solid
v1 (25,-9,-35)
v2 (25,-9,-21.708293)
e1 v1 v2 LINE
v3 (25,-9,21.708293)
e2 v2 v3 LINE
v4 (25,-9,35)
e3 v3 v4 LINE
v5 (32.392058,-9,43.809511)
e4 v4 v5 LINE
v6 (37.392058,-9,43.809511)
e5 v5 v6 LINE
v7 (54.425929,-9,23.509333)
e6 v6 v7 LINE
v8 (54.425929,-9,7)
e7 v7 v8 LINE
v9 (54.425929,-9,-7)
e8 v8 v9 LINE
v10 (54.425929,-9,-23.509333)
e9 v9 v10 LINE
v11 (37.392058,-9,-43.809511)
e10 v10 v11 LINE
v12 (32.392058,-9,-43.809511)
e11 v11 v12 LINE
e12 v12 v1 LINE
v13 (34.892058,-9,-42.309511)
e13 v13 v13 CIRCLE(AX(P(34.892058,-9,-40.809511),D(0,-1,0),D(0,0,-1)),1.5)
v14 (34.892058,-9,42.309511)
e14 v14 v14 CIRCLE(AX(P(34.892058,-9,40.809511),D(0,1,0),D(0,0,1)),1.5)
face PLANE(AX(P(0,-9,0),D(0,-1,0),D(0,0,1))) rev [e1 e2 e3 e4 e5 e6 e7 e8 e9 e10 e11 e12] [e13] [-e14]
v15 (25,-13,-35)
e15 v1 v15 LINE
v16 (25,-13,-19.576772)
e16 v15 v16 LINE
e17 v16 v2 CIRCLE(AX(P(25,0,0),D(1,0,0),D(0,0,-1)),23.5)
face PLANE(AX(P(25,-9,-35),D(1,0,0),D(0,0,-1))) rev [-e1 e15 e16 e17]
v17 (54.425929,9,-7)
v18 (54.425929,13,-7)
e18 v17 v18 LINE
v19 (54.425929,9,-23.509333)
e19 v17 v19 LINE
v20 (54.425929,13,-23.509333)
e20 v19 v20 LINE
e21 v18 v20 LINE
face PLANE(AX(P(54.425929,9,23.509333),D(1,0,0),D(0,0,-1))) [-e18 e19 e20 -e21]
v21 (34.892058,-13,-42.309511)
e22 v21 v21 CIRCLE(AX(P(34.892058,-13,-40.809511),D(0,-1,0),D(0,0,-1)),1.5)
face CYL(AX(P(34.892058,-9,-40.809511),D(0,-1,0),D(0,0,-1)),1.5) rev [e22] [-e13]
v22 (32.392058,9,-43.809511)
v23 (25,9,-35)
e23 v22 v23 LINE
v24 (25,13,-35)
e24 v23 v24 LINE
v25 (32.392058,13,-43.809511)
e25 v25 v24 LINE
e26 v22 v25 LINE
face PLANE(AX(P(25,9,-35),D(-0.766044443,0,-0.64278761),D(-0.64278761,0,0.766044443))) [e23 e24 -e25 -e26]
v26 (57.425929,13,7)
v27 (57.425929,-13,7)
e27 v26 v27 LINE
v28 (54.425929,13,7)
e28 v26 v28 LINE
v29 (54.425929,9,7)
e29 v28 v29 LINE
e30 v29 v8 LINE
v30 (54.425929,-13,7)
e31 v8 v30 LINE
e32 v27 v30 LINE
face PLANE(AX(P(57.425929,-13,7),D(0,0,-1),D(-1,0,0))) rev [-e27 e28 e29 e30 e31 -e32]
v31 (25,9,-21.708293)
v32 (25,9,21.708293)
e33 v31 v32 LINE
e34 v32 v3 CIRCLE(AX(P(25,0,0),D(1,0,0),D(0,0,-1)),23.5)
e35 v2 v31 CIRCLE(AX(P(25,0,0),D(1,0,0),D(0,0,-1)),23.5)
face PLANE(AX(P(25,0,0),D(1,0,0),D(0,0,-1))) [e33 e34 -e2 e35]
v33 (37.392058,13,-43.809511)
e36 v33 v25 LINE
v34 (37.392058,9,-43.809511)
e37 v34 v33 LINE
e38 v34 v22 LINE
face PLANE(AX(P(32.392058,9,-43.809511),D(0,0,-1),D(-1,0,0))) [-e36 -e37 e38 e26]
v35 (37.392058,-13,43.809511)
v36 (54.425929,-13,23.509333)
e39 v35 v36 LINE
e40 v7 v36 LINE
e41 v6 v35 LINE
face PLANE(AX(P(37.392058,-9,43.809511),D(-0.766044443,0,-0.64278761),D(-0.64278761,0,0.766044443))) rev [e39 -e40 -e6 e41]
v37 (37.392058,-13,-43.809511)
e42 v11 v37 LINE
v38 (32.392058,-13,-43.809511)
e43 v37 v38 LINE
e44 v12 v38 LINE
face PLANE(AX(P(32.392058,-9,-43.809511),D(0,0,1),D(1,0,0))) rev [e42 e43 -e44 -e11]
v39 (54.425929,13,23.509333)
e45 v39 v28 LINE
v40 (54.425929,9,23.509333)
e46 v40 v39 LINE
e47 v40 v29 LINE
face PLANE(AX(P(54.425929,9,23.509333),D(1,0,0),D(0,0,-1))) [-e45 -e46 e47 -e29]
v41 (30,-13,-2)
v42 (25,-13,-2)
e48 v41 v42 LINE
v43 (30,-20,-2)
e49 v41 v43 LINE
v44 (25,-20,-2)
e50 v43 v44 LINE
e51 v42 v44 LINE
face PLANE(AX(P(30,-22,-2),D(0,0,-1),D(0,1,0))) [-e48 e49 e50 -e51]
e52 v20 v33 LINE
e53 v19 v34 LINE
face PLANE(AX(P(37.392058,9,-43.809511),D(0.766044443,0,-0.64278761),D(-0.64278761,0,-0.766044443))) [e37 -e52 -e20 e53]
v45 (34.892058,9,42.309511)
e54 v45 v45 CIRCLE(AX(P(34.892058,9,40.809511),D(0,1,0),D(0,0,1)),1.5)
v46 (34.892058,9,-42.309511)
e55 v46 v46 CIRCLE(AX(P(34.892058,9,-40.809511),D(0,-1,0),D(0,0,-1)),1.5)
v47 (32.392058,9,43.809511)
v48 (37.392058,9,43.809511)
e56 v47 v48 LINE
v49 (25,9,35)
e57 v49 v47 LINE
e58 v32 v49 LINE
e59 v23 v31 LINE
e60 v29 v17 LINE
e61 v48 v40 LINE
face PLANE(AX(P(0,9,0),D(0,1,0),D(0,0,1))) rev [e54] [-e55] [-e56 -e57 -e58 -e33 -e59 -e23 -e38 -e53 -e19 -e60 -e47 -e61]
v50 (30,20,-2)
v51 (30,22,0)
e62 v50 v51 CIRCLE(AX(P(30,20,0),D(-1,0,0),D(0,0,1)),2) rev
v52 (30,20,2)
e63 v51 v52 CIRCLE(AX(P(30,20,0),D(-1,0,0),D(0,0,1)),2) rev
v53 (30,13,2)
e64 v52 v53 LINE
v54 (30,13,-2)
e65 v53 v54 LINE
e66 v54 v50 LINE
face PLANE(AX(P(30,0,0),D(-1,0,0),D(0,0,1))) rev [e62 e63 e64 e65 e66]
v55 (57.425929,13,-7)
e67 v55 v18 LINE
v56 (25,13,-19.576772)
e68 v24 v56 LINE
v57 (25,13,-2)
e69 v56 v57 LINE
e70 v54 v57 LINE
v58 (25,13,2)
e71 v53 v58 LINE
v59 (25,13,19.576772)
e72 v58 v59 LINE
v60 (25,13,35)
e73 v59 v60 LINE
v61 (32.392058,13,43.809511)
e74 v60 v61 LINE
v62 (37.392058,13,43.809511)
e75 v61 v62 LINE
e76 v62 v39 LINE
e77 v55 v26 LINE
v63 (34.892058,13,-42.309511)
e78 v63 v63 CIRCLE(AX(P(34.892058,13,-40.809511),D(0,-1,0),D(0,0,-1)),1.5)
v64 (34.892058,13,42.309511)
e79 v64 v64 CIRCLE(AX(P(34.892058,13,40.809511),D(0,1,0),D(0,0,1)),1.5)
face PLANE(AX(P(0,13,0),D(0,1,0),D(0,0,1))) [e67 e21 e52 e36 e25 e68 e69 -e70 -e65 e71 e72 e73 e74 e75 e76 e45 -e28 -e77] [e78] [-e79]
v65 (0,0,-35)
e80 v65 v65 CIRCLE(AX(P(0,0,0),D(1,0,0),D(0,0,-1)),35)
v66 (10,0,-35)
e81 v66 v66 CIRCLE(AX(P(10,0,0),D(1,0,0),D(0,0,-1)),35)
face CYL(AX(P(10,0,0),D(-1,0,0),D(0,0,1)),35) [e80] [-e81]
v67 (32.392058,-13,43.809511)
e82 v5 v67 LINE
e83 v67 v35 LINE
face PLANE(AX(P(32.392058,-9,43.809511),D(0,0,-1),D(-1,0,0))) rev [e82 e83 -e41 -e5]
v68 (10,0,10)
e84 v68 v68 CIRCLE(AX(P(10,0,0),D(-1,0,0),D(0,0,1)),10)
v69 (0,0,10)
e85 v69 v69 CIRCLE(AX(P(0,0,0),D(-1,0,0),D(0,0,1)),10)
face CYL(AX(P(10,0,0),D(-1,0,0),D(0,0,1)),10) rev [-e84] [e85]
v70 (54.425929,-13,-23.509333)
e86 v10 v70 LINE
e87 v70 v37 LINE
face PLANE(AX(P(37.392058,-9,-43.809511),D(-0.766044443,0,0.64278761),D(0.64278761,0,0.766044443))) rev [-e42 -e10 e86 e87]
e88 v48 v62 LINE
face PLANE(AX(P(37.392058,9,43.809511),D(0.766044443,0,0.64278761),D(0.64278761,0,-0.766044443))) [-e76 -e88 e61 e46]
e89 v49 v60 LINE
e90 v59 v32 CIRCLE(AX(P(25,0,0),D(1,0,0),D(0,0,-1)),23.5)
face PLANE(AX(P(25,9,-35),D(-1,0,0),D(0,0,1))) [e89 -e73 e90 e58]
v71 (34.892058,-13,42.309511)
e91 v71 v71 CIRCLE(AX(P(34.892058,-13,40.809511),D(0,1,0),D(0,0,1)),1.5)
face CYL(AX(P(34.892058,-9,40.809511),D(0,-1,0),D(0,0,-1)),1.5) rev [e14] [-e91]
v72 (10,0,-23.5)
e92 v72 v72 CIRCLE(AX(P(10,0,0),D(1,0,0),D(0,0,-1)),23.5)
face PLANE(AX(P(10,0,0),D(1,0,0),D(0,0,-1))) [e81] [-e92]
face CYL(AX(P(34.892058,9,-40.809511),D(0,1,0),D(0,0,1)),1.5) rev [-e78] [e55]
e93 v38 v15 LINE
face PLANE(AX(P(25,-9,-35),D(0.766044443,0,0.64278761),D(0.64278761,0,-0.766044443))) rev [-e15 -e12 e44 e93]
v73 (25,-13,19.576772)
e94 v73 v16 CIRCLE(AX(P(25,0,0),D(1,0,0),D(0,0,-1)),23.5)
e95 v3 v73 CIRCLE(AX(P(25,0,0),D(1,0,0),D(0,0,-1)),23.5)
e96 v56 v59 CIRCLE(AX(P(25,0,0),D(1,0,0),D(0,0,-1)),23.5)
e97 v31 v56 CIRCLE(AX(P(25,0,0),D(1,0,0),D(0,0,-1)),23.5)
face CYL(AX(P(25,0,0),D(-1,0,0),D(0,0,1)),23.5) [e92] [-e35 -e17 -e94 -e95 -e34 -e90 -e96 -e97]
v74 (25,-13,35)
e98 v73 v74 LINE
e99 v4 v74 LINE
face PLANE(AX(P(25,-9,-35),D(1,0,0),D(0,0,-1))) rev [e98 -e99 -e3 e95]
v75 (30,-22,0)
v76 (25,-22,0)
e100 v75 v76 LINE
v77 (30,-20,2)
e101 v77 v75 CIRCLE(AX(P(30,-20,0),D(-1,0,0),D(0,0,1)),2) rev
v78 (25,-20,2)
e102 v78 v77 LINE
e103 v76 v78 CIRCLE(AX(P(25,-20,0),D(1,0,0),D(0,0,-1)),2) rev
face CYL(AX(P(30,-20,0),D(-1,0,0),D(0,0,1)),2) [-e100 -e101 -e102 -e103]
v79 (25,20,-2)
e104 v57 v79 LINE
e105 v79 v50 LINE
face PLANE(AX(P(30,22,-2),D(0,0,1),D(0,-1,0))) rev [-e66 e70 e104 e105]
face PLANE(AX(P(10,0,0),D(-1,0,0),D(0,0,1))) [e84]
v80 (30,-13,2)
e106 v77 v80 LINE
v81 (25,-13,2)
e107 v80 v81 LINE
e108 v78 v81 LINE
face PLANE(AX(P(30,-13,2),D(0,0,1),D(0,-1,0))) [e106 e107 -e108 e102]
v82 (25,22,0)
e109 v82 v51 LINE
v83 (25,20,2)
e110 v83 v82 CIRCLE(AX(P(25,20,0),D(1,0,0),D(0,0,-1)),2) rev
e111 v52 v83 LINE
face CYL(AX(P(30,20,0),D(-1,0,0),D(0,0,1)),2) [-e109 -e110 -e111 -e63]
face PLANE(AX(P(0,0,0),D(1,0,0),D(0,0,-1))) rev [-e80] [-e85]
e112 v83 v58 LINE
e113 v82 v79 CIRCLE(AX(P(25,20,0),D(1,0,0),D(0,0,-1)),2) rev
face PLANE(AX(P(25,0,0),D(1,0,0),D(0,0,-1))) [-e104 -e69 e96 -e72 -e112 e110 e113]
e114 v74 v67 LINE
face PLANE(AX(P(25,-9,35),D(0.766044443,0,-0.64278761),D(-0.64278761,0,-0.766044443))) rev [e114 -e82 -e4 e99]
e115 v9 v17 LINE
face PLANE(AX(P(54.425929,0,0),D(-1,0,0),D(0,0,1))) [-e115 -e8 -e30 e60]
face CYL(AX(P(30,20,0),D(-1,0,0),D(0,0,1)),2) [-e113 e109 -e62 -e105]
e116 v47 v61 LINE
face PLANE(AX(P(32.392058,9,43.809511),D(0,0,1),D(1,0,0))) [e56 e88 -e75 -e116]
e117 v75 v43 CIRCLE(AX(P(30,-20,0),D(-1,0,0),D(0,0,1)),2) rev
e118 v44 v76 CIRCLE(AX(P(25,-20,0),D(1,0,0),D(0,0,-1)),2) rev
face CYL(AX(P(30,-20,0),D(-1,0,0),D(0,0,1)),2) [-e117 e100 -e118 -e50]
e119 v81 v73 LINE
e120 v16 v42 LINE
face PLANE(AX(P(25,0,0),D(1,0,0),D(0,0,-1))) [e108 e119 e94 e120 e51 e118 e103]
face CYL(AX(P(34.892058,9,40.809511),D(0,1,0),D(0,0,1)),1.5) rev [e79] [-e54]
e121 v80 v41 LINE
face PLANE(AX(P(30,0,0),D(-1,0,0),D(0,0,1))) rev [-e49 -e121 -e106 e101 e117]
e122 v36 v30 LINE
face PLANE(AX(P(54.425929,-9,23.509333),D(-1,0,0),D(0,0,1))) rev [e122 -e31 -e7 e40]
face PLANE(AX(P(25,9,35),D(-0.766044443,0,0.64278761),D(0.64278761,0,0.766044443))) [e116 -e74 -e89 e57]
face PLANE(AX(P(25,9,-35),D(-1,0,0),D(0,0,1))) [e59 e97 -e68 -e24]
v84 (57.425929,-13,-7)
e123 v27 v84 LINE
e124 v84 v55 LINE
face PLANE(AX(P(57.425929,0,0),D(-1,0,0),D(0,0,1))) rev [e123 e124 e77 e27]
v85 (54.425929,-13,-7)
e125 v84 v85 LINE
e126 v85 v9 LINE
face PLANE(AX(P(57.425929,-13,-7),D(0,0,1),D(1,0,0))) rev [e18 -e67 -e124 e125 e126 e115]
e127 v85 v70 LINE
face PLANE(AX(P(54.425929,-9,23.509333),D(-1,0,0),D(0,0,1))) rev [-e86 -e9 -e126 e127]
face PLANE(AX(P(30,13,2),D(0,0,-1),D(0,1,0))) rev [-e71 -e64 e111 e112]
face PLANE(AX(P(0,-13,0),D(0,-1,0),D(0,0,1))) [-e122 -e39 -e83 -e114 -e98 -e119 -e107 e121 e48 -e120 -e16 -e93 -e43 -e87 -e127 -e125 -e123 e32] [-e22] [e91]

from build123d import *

# Parameters (mm, degrees)
SKETCH1_R               = 35
BOSS_EXTRUDE2_DEPTH     = 10
SKETCH3_R               = 23.5
BOSS_EXTRUDE3_DEPTH     = 15
BOSS_EXTRUDE4_DEPTH     = 4
SKETCH7_R               = 1.5
CUT_EXTRUDE1_DEPTH      = 4
MIRROR2_COPY_1_SKETCH_R = 1.5
MIRROR2_COPY_1_DEPTH    = 4
SKETCH9_W               = 4
SKETCH9_H               = 9
BOSS_EXTRUDE5_DEPTH     = 5
FILLET1_R               = 2
FILLET1_OF_MIRROR3_R    = 2
SKETCH10_W              = 14
SKETCH10_H              = 26
BOSS_EXTRUDE6_DEPTH     = 3
SKETCH11_R              = 10
CUT_EXTRUDE2_DEPTH      = 10


with BuildPart() as part:
    # Sketch1 → Boss-Extrude2 (new body)
    with BuildSketch(Plane(origin=(0, 0, 0), x_dir=(0, 0, -1), z_dir=(1, 0, 0))):
        Circle(SKETCH1_R)
    extrude(amount=BOSS_EXTRUDE2_DEPTH)

    # Sketch3 → Boss-Extrude3 (add)
    with BuildSketch(Plane(origin=(10, 0, 0), x_dir=(0, 0, -1), z_dir=(1, 0, 0))):
        Circle(SKETCH3_R)
    extrude(amount=BOSS_EXTRUDE3_DEPTH)

    # Sketch5 → Boss-Extrude4 (add)
    with BuildSketch(Plane(origin=(0, 13, 0), x_dir=(1, 0, 0), z_dir=(0, 1, 0))):
        Polygon((25, 35), (25, -35), (32.392057511, -43.809511096), (37.392057511, -43.809511096), (54.425929168, -23.509333353), (54.425929168, 23.509333353), (37.392057511, 43.809511096), (32.392057511, 43.809511096), align=None)
    boss_extrude4 = extrude(amount=-BOSS_EXTRUDE4_DEPTH)

    # Sketch7 → Cut-Extrude1 (cut)
    with BuildSketch(Plane(origin=(0, 13, 0), x_dir=(1, 0, 0), z_dir=(0, 1, 0))):
        with Locations(Location((34.892057511, -40.809511096, 0), (0, 0, 270))):
            Circle(SKETCH7_R)
    cut_extrude1 = extrude(amount=-CUT_EXTRUDE1_DEPTH, mode=Mode.SUBTRACT)

    # Mirror1: Cut-Extrude1 across plane
    add(cut_extrude1.mirror(Plane.XY), mode=Mode.SUBTRACT)

    # Mirror2: Boss-Extrude4, Cut-Extrude1 across plane
    add(boss_extrude4.mirror(Plane.ZX))
    add(cut_extrude1.mirror(Plane.ZX), mode=Mode.SUBTRACT)

    # Mirror2 copy 1 sketch → Mirror2 copy 1 (cut)
    with BuildSketch(Plane.XZ.offset(13)):
        with Locations(Location((34.892057511, -40.809511096, 0), (0, 0, 270))):
            Circle(MIRROR2_COPY_1_SKETCH_R)
    extrude(amount=-MIRROR2_COPY_1_DEPTH, mode=Mode.SUBTRACT)

    # Sketch9 → Boss-Extrude5 (add)
    with BuildSketch(Plane(origin=(25, 0, 0), x_dir=(0, 0, -1), z_dir=(1, 0, 0))):
        with Locations((0, 17.5)):
            Rectangle(SKETCH9_W, SKETCH9_H)
    boss_extrude5 = extrude(amount=BOSS_EXTRUDE5_DEPTH)

    # Fillet1
    fillet1_edges = [part.edges().sort_by_distance(p)[0] for p in [
        (27.5, 22, -2),
        (27.5, 22, 2),
    ]]
    fillet(fillet1_edges, radius=FILLET1_R - 0.0001)  # a hair under: the kernel refuses the full size

    # Mirror3: Boss-Extrude5 across plane
    add(boss_extrude5.mirror(Plane.ZX))

    # Fillet1 of Mirror3
    fillet1_of_mirror3_edges = [part.edges().sort_by_distance(p)[0] for p in [
        (27.5, -22, -2),
        (27.5, -22, 2),
    ]]
    fillet(fillet1_of_mirror3_edges, radius=FILLET1_OF_MIRROR3_R - 0.0001)  # a hair under: the kernel refuses the full size

    # Sketch10 → Boss-Extrude6 (add)
    with BuildSketch(Plane(origin=(54.425929168, 0, 0), x_dir=(0, 0, -1), z_dir=(1, 0, 0))):
        Rectangle(SKETCH10_W, SKETCH10_H)
    extrude(amount=BOSS_EXTRUDE6_DEPTH)

    # Sketch11 → Cut-Extrude2 (cut)
    with BuildSketch(Plane.ZY):
        Circle(SKETCH11_R)
    extrude(amount=-CUT_EXTRUDE2_DEPTH, mode=Mode.SUBTRACT)


solid = part.part
